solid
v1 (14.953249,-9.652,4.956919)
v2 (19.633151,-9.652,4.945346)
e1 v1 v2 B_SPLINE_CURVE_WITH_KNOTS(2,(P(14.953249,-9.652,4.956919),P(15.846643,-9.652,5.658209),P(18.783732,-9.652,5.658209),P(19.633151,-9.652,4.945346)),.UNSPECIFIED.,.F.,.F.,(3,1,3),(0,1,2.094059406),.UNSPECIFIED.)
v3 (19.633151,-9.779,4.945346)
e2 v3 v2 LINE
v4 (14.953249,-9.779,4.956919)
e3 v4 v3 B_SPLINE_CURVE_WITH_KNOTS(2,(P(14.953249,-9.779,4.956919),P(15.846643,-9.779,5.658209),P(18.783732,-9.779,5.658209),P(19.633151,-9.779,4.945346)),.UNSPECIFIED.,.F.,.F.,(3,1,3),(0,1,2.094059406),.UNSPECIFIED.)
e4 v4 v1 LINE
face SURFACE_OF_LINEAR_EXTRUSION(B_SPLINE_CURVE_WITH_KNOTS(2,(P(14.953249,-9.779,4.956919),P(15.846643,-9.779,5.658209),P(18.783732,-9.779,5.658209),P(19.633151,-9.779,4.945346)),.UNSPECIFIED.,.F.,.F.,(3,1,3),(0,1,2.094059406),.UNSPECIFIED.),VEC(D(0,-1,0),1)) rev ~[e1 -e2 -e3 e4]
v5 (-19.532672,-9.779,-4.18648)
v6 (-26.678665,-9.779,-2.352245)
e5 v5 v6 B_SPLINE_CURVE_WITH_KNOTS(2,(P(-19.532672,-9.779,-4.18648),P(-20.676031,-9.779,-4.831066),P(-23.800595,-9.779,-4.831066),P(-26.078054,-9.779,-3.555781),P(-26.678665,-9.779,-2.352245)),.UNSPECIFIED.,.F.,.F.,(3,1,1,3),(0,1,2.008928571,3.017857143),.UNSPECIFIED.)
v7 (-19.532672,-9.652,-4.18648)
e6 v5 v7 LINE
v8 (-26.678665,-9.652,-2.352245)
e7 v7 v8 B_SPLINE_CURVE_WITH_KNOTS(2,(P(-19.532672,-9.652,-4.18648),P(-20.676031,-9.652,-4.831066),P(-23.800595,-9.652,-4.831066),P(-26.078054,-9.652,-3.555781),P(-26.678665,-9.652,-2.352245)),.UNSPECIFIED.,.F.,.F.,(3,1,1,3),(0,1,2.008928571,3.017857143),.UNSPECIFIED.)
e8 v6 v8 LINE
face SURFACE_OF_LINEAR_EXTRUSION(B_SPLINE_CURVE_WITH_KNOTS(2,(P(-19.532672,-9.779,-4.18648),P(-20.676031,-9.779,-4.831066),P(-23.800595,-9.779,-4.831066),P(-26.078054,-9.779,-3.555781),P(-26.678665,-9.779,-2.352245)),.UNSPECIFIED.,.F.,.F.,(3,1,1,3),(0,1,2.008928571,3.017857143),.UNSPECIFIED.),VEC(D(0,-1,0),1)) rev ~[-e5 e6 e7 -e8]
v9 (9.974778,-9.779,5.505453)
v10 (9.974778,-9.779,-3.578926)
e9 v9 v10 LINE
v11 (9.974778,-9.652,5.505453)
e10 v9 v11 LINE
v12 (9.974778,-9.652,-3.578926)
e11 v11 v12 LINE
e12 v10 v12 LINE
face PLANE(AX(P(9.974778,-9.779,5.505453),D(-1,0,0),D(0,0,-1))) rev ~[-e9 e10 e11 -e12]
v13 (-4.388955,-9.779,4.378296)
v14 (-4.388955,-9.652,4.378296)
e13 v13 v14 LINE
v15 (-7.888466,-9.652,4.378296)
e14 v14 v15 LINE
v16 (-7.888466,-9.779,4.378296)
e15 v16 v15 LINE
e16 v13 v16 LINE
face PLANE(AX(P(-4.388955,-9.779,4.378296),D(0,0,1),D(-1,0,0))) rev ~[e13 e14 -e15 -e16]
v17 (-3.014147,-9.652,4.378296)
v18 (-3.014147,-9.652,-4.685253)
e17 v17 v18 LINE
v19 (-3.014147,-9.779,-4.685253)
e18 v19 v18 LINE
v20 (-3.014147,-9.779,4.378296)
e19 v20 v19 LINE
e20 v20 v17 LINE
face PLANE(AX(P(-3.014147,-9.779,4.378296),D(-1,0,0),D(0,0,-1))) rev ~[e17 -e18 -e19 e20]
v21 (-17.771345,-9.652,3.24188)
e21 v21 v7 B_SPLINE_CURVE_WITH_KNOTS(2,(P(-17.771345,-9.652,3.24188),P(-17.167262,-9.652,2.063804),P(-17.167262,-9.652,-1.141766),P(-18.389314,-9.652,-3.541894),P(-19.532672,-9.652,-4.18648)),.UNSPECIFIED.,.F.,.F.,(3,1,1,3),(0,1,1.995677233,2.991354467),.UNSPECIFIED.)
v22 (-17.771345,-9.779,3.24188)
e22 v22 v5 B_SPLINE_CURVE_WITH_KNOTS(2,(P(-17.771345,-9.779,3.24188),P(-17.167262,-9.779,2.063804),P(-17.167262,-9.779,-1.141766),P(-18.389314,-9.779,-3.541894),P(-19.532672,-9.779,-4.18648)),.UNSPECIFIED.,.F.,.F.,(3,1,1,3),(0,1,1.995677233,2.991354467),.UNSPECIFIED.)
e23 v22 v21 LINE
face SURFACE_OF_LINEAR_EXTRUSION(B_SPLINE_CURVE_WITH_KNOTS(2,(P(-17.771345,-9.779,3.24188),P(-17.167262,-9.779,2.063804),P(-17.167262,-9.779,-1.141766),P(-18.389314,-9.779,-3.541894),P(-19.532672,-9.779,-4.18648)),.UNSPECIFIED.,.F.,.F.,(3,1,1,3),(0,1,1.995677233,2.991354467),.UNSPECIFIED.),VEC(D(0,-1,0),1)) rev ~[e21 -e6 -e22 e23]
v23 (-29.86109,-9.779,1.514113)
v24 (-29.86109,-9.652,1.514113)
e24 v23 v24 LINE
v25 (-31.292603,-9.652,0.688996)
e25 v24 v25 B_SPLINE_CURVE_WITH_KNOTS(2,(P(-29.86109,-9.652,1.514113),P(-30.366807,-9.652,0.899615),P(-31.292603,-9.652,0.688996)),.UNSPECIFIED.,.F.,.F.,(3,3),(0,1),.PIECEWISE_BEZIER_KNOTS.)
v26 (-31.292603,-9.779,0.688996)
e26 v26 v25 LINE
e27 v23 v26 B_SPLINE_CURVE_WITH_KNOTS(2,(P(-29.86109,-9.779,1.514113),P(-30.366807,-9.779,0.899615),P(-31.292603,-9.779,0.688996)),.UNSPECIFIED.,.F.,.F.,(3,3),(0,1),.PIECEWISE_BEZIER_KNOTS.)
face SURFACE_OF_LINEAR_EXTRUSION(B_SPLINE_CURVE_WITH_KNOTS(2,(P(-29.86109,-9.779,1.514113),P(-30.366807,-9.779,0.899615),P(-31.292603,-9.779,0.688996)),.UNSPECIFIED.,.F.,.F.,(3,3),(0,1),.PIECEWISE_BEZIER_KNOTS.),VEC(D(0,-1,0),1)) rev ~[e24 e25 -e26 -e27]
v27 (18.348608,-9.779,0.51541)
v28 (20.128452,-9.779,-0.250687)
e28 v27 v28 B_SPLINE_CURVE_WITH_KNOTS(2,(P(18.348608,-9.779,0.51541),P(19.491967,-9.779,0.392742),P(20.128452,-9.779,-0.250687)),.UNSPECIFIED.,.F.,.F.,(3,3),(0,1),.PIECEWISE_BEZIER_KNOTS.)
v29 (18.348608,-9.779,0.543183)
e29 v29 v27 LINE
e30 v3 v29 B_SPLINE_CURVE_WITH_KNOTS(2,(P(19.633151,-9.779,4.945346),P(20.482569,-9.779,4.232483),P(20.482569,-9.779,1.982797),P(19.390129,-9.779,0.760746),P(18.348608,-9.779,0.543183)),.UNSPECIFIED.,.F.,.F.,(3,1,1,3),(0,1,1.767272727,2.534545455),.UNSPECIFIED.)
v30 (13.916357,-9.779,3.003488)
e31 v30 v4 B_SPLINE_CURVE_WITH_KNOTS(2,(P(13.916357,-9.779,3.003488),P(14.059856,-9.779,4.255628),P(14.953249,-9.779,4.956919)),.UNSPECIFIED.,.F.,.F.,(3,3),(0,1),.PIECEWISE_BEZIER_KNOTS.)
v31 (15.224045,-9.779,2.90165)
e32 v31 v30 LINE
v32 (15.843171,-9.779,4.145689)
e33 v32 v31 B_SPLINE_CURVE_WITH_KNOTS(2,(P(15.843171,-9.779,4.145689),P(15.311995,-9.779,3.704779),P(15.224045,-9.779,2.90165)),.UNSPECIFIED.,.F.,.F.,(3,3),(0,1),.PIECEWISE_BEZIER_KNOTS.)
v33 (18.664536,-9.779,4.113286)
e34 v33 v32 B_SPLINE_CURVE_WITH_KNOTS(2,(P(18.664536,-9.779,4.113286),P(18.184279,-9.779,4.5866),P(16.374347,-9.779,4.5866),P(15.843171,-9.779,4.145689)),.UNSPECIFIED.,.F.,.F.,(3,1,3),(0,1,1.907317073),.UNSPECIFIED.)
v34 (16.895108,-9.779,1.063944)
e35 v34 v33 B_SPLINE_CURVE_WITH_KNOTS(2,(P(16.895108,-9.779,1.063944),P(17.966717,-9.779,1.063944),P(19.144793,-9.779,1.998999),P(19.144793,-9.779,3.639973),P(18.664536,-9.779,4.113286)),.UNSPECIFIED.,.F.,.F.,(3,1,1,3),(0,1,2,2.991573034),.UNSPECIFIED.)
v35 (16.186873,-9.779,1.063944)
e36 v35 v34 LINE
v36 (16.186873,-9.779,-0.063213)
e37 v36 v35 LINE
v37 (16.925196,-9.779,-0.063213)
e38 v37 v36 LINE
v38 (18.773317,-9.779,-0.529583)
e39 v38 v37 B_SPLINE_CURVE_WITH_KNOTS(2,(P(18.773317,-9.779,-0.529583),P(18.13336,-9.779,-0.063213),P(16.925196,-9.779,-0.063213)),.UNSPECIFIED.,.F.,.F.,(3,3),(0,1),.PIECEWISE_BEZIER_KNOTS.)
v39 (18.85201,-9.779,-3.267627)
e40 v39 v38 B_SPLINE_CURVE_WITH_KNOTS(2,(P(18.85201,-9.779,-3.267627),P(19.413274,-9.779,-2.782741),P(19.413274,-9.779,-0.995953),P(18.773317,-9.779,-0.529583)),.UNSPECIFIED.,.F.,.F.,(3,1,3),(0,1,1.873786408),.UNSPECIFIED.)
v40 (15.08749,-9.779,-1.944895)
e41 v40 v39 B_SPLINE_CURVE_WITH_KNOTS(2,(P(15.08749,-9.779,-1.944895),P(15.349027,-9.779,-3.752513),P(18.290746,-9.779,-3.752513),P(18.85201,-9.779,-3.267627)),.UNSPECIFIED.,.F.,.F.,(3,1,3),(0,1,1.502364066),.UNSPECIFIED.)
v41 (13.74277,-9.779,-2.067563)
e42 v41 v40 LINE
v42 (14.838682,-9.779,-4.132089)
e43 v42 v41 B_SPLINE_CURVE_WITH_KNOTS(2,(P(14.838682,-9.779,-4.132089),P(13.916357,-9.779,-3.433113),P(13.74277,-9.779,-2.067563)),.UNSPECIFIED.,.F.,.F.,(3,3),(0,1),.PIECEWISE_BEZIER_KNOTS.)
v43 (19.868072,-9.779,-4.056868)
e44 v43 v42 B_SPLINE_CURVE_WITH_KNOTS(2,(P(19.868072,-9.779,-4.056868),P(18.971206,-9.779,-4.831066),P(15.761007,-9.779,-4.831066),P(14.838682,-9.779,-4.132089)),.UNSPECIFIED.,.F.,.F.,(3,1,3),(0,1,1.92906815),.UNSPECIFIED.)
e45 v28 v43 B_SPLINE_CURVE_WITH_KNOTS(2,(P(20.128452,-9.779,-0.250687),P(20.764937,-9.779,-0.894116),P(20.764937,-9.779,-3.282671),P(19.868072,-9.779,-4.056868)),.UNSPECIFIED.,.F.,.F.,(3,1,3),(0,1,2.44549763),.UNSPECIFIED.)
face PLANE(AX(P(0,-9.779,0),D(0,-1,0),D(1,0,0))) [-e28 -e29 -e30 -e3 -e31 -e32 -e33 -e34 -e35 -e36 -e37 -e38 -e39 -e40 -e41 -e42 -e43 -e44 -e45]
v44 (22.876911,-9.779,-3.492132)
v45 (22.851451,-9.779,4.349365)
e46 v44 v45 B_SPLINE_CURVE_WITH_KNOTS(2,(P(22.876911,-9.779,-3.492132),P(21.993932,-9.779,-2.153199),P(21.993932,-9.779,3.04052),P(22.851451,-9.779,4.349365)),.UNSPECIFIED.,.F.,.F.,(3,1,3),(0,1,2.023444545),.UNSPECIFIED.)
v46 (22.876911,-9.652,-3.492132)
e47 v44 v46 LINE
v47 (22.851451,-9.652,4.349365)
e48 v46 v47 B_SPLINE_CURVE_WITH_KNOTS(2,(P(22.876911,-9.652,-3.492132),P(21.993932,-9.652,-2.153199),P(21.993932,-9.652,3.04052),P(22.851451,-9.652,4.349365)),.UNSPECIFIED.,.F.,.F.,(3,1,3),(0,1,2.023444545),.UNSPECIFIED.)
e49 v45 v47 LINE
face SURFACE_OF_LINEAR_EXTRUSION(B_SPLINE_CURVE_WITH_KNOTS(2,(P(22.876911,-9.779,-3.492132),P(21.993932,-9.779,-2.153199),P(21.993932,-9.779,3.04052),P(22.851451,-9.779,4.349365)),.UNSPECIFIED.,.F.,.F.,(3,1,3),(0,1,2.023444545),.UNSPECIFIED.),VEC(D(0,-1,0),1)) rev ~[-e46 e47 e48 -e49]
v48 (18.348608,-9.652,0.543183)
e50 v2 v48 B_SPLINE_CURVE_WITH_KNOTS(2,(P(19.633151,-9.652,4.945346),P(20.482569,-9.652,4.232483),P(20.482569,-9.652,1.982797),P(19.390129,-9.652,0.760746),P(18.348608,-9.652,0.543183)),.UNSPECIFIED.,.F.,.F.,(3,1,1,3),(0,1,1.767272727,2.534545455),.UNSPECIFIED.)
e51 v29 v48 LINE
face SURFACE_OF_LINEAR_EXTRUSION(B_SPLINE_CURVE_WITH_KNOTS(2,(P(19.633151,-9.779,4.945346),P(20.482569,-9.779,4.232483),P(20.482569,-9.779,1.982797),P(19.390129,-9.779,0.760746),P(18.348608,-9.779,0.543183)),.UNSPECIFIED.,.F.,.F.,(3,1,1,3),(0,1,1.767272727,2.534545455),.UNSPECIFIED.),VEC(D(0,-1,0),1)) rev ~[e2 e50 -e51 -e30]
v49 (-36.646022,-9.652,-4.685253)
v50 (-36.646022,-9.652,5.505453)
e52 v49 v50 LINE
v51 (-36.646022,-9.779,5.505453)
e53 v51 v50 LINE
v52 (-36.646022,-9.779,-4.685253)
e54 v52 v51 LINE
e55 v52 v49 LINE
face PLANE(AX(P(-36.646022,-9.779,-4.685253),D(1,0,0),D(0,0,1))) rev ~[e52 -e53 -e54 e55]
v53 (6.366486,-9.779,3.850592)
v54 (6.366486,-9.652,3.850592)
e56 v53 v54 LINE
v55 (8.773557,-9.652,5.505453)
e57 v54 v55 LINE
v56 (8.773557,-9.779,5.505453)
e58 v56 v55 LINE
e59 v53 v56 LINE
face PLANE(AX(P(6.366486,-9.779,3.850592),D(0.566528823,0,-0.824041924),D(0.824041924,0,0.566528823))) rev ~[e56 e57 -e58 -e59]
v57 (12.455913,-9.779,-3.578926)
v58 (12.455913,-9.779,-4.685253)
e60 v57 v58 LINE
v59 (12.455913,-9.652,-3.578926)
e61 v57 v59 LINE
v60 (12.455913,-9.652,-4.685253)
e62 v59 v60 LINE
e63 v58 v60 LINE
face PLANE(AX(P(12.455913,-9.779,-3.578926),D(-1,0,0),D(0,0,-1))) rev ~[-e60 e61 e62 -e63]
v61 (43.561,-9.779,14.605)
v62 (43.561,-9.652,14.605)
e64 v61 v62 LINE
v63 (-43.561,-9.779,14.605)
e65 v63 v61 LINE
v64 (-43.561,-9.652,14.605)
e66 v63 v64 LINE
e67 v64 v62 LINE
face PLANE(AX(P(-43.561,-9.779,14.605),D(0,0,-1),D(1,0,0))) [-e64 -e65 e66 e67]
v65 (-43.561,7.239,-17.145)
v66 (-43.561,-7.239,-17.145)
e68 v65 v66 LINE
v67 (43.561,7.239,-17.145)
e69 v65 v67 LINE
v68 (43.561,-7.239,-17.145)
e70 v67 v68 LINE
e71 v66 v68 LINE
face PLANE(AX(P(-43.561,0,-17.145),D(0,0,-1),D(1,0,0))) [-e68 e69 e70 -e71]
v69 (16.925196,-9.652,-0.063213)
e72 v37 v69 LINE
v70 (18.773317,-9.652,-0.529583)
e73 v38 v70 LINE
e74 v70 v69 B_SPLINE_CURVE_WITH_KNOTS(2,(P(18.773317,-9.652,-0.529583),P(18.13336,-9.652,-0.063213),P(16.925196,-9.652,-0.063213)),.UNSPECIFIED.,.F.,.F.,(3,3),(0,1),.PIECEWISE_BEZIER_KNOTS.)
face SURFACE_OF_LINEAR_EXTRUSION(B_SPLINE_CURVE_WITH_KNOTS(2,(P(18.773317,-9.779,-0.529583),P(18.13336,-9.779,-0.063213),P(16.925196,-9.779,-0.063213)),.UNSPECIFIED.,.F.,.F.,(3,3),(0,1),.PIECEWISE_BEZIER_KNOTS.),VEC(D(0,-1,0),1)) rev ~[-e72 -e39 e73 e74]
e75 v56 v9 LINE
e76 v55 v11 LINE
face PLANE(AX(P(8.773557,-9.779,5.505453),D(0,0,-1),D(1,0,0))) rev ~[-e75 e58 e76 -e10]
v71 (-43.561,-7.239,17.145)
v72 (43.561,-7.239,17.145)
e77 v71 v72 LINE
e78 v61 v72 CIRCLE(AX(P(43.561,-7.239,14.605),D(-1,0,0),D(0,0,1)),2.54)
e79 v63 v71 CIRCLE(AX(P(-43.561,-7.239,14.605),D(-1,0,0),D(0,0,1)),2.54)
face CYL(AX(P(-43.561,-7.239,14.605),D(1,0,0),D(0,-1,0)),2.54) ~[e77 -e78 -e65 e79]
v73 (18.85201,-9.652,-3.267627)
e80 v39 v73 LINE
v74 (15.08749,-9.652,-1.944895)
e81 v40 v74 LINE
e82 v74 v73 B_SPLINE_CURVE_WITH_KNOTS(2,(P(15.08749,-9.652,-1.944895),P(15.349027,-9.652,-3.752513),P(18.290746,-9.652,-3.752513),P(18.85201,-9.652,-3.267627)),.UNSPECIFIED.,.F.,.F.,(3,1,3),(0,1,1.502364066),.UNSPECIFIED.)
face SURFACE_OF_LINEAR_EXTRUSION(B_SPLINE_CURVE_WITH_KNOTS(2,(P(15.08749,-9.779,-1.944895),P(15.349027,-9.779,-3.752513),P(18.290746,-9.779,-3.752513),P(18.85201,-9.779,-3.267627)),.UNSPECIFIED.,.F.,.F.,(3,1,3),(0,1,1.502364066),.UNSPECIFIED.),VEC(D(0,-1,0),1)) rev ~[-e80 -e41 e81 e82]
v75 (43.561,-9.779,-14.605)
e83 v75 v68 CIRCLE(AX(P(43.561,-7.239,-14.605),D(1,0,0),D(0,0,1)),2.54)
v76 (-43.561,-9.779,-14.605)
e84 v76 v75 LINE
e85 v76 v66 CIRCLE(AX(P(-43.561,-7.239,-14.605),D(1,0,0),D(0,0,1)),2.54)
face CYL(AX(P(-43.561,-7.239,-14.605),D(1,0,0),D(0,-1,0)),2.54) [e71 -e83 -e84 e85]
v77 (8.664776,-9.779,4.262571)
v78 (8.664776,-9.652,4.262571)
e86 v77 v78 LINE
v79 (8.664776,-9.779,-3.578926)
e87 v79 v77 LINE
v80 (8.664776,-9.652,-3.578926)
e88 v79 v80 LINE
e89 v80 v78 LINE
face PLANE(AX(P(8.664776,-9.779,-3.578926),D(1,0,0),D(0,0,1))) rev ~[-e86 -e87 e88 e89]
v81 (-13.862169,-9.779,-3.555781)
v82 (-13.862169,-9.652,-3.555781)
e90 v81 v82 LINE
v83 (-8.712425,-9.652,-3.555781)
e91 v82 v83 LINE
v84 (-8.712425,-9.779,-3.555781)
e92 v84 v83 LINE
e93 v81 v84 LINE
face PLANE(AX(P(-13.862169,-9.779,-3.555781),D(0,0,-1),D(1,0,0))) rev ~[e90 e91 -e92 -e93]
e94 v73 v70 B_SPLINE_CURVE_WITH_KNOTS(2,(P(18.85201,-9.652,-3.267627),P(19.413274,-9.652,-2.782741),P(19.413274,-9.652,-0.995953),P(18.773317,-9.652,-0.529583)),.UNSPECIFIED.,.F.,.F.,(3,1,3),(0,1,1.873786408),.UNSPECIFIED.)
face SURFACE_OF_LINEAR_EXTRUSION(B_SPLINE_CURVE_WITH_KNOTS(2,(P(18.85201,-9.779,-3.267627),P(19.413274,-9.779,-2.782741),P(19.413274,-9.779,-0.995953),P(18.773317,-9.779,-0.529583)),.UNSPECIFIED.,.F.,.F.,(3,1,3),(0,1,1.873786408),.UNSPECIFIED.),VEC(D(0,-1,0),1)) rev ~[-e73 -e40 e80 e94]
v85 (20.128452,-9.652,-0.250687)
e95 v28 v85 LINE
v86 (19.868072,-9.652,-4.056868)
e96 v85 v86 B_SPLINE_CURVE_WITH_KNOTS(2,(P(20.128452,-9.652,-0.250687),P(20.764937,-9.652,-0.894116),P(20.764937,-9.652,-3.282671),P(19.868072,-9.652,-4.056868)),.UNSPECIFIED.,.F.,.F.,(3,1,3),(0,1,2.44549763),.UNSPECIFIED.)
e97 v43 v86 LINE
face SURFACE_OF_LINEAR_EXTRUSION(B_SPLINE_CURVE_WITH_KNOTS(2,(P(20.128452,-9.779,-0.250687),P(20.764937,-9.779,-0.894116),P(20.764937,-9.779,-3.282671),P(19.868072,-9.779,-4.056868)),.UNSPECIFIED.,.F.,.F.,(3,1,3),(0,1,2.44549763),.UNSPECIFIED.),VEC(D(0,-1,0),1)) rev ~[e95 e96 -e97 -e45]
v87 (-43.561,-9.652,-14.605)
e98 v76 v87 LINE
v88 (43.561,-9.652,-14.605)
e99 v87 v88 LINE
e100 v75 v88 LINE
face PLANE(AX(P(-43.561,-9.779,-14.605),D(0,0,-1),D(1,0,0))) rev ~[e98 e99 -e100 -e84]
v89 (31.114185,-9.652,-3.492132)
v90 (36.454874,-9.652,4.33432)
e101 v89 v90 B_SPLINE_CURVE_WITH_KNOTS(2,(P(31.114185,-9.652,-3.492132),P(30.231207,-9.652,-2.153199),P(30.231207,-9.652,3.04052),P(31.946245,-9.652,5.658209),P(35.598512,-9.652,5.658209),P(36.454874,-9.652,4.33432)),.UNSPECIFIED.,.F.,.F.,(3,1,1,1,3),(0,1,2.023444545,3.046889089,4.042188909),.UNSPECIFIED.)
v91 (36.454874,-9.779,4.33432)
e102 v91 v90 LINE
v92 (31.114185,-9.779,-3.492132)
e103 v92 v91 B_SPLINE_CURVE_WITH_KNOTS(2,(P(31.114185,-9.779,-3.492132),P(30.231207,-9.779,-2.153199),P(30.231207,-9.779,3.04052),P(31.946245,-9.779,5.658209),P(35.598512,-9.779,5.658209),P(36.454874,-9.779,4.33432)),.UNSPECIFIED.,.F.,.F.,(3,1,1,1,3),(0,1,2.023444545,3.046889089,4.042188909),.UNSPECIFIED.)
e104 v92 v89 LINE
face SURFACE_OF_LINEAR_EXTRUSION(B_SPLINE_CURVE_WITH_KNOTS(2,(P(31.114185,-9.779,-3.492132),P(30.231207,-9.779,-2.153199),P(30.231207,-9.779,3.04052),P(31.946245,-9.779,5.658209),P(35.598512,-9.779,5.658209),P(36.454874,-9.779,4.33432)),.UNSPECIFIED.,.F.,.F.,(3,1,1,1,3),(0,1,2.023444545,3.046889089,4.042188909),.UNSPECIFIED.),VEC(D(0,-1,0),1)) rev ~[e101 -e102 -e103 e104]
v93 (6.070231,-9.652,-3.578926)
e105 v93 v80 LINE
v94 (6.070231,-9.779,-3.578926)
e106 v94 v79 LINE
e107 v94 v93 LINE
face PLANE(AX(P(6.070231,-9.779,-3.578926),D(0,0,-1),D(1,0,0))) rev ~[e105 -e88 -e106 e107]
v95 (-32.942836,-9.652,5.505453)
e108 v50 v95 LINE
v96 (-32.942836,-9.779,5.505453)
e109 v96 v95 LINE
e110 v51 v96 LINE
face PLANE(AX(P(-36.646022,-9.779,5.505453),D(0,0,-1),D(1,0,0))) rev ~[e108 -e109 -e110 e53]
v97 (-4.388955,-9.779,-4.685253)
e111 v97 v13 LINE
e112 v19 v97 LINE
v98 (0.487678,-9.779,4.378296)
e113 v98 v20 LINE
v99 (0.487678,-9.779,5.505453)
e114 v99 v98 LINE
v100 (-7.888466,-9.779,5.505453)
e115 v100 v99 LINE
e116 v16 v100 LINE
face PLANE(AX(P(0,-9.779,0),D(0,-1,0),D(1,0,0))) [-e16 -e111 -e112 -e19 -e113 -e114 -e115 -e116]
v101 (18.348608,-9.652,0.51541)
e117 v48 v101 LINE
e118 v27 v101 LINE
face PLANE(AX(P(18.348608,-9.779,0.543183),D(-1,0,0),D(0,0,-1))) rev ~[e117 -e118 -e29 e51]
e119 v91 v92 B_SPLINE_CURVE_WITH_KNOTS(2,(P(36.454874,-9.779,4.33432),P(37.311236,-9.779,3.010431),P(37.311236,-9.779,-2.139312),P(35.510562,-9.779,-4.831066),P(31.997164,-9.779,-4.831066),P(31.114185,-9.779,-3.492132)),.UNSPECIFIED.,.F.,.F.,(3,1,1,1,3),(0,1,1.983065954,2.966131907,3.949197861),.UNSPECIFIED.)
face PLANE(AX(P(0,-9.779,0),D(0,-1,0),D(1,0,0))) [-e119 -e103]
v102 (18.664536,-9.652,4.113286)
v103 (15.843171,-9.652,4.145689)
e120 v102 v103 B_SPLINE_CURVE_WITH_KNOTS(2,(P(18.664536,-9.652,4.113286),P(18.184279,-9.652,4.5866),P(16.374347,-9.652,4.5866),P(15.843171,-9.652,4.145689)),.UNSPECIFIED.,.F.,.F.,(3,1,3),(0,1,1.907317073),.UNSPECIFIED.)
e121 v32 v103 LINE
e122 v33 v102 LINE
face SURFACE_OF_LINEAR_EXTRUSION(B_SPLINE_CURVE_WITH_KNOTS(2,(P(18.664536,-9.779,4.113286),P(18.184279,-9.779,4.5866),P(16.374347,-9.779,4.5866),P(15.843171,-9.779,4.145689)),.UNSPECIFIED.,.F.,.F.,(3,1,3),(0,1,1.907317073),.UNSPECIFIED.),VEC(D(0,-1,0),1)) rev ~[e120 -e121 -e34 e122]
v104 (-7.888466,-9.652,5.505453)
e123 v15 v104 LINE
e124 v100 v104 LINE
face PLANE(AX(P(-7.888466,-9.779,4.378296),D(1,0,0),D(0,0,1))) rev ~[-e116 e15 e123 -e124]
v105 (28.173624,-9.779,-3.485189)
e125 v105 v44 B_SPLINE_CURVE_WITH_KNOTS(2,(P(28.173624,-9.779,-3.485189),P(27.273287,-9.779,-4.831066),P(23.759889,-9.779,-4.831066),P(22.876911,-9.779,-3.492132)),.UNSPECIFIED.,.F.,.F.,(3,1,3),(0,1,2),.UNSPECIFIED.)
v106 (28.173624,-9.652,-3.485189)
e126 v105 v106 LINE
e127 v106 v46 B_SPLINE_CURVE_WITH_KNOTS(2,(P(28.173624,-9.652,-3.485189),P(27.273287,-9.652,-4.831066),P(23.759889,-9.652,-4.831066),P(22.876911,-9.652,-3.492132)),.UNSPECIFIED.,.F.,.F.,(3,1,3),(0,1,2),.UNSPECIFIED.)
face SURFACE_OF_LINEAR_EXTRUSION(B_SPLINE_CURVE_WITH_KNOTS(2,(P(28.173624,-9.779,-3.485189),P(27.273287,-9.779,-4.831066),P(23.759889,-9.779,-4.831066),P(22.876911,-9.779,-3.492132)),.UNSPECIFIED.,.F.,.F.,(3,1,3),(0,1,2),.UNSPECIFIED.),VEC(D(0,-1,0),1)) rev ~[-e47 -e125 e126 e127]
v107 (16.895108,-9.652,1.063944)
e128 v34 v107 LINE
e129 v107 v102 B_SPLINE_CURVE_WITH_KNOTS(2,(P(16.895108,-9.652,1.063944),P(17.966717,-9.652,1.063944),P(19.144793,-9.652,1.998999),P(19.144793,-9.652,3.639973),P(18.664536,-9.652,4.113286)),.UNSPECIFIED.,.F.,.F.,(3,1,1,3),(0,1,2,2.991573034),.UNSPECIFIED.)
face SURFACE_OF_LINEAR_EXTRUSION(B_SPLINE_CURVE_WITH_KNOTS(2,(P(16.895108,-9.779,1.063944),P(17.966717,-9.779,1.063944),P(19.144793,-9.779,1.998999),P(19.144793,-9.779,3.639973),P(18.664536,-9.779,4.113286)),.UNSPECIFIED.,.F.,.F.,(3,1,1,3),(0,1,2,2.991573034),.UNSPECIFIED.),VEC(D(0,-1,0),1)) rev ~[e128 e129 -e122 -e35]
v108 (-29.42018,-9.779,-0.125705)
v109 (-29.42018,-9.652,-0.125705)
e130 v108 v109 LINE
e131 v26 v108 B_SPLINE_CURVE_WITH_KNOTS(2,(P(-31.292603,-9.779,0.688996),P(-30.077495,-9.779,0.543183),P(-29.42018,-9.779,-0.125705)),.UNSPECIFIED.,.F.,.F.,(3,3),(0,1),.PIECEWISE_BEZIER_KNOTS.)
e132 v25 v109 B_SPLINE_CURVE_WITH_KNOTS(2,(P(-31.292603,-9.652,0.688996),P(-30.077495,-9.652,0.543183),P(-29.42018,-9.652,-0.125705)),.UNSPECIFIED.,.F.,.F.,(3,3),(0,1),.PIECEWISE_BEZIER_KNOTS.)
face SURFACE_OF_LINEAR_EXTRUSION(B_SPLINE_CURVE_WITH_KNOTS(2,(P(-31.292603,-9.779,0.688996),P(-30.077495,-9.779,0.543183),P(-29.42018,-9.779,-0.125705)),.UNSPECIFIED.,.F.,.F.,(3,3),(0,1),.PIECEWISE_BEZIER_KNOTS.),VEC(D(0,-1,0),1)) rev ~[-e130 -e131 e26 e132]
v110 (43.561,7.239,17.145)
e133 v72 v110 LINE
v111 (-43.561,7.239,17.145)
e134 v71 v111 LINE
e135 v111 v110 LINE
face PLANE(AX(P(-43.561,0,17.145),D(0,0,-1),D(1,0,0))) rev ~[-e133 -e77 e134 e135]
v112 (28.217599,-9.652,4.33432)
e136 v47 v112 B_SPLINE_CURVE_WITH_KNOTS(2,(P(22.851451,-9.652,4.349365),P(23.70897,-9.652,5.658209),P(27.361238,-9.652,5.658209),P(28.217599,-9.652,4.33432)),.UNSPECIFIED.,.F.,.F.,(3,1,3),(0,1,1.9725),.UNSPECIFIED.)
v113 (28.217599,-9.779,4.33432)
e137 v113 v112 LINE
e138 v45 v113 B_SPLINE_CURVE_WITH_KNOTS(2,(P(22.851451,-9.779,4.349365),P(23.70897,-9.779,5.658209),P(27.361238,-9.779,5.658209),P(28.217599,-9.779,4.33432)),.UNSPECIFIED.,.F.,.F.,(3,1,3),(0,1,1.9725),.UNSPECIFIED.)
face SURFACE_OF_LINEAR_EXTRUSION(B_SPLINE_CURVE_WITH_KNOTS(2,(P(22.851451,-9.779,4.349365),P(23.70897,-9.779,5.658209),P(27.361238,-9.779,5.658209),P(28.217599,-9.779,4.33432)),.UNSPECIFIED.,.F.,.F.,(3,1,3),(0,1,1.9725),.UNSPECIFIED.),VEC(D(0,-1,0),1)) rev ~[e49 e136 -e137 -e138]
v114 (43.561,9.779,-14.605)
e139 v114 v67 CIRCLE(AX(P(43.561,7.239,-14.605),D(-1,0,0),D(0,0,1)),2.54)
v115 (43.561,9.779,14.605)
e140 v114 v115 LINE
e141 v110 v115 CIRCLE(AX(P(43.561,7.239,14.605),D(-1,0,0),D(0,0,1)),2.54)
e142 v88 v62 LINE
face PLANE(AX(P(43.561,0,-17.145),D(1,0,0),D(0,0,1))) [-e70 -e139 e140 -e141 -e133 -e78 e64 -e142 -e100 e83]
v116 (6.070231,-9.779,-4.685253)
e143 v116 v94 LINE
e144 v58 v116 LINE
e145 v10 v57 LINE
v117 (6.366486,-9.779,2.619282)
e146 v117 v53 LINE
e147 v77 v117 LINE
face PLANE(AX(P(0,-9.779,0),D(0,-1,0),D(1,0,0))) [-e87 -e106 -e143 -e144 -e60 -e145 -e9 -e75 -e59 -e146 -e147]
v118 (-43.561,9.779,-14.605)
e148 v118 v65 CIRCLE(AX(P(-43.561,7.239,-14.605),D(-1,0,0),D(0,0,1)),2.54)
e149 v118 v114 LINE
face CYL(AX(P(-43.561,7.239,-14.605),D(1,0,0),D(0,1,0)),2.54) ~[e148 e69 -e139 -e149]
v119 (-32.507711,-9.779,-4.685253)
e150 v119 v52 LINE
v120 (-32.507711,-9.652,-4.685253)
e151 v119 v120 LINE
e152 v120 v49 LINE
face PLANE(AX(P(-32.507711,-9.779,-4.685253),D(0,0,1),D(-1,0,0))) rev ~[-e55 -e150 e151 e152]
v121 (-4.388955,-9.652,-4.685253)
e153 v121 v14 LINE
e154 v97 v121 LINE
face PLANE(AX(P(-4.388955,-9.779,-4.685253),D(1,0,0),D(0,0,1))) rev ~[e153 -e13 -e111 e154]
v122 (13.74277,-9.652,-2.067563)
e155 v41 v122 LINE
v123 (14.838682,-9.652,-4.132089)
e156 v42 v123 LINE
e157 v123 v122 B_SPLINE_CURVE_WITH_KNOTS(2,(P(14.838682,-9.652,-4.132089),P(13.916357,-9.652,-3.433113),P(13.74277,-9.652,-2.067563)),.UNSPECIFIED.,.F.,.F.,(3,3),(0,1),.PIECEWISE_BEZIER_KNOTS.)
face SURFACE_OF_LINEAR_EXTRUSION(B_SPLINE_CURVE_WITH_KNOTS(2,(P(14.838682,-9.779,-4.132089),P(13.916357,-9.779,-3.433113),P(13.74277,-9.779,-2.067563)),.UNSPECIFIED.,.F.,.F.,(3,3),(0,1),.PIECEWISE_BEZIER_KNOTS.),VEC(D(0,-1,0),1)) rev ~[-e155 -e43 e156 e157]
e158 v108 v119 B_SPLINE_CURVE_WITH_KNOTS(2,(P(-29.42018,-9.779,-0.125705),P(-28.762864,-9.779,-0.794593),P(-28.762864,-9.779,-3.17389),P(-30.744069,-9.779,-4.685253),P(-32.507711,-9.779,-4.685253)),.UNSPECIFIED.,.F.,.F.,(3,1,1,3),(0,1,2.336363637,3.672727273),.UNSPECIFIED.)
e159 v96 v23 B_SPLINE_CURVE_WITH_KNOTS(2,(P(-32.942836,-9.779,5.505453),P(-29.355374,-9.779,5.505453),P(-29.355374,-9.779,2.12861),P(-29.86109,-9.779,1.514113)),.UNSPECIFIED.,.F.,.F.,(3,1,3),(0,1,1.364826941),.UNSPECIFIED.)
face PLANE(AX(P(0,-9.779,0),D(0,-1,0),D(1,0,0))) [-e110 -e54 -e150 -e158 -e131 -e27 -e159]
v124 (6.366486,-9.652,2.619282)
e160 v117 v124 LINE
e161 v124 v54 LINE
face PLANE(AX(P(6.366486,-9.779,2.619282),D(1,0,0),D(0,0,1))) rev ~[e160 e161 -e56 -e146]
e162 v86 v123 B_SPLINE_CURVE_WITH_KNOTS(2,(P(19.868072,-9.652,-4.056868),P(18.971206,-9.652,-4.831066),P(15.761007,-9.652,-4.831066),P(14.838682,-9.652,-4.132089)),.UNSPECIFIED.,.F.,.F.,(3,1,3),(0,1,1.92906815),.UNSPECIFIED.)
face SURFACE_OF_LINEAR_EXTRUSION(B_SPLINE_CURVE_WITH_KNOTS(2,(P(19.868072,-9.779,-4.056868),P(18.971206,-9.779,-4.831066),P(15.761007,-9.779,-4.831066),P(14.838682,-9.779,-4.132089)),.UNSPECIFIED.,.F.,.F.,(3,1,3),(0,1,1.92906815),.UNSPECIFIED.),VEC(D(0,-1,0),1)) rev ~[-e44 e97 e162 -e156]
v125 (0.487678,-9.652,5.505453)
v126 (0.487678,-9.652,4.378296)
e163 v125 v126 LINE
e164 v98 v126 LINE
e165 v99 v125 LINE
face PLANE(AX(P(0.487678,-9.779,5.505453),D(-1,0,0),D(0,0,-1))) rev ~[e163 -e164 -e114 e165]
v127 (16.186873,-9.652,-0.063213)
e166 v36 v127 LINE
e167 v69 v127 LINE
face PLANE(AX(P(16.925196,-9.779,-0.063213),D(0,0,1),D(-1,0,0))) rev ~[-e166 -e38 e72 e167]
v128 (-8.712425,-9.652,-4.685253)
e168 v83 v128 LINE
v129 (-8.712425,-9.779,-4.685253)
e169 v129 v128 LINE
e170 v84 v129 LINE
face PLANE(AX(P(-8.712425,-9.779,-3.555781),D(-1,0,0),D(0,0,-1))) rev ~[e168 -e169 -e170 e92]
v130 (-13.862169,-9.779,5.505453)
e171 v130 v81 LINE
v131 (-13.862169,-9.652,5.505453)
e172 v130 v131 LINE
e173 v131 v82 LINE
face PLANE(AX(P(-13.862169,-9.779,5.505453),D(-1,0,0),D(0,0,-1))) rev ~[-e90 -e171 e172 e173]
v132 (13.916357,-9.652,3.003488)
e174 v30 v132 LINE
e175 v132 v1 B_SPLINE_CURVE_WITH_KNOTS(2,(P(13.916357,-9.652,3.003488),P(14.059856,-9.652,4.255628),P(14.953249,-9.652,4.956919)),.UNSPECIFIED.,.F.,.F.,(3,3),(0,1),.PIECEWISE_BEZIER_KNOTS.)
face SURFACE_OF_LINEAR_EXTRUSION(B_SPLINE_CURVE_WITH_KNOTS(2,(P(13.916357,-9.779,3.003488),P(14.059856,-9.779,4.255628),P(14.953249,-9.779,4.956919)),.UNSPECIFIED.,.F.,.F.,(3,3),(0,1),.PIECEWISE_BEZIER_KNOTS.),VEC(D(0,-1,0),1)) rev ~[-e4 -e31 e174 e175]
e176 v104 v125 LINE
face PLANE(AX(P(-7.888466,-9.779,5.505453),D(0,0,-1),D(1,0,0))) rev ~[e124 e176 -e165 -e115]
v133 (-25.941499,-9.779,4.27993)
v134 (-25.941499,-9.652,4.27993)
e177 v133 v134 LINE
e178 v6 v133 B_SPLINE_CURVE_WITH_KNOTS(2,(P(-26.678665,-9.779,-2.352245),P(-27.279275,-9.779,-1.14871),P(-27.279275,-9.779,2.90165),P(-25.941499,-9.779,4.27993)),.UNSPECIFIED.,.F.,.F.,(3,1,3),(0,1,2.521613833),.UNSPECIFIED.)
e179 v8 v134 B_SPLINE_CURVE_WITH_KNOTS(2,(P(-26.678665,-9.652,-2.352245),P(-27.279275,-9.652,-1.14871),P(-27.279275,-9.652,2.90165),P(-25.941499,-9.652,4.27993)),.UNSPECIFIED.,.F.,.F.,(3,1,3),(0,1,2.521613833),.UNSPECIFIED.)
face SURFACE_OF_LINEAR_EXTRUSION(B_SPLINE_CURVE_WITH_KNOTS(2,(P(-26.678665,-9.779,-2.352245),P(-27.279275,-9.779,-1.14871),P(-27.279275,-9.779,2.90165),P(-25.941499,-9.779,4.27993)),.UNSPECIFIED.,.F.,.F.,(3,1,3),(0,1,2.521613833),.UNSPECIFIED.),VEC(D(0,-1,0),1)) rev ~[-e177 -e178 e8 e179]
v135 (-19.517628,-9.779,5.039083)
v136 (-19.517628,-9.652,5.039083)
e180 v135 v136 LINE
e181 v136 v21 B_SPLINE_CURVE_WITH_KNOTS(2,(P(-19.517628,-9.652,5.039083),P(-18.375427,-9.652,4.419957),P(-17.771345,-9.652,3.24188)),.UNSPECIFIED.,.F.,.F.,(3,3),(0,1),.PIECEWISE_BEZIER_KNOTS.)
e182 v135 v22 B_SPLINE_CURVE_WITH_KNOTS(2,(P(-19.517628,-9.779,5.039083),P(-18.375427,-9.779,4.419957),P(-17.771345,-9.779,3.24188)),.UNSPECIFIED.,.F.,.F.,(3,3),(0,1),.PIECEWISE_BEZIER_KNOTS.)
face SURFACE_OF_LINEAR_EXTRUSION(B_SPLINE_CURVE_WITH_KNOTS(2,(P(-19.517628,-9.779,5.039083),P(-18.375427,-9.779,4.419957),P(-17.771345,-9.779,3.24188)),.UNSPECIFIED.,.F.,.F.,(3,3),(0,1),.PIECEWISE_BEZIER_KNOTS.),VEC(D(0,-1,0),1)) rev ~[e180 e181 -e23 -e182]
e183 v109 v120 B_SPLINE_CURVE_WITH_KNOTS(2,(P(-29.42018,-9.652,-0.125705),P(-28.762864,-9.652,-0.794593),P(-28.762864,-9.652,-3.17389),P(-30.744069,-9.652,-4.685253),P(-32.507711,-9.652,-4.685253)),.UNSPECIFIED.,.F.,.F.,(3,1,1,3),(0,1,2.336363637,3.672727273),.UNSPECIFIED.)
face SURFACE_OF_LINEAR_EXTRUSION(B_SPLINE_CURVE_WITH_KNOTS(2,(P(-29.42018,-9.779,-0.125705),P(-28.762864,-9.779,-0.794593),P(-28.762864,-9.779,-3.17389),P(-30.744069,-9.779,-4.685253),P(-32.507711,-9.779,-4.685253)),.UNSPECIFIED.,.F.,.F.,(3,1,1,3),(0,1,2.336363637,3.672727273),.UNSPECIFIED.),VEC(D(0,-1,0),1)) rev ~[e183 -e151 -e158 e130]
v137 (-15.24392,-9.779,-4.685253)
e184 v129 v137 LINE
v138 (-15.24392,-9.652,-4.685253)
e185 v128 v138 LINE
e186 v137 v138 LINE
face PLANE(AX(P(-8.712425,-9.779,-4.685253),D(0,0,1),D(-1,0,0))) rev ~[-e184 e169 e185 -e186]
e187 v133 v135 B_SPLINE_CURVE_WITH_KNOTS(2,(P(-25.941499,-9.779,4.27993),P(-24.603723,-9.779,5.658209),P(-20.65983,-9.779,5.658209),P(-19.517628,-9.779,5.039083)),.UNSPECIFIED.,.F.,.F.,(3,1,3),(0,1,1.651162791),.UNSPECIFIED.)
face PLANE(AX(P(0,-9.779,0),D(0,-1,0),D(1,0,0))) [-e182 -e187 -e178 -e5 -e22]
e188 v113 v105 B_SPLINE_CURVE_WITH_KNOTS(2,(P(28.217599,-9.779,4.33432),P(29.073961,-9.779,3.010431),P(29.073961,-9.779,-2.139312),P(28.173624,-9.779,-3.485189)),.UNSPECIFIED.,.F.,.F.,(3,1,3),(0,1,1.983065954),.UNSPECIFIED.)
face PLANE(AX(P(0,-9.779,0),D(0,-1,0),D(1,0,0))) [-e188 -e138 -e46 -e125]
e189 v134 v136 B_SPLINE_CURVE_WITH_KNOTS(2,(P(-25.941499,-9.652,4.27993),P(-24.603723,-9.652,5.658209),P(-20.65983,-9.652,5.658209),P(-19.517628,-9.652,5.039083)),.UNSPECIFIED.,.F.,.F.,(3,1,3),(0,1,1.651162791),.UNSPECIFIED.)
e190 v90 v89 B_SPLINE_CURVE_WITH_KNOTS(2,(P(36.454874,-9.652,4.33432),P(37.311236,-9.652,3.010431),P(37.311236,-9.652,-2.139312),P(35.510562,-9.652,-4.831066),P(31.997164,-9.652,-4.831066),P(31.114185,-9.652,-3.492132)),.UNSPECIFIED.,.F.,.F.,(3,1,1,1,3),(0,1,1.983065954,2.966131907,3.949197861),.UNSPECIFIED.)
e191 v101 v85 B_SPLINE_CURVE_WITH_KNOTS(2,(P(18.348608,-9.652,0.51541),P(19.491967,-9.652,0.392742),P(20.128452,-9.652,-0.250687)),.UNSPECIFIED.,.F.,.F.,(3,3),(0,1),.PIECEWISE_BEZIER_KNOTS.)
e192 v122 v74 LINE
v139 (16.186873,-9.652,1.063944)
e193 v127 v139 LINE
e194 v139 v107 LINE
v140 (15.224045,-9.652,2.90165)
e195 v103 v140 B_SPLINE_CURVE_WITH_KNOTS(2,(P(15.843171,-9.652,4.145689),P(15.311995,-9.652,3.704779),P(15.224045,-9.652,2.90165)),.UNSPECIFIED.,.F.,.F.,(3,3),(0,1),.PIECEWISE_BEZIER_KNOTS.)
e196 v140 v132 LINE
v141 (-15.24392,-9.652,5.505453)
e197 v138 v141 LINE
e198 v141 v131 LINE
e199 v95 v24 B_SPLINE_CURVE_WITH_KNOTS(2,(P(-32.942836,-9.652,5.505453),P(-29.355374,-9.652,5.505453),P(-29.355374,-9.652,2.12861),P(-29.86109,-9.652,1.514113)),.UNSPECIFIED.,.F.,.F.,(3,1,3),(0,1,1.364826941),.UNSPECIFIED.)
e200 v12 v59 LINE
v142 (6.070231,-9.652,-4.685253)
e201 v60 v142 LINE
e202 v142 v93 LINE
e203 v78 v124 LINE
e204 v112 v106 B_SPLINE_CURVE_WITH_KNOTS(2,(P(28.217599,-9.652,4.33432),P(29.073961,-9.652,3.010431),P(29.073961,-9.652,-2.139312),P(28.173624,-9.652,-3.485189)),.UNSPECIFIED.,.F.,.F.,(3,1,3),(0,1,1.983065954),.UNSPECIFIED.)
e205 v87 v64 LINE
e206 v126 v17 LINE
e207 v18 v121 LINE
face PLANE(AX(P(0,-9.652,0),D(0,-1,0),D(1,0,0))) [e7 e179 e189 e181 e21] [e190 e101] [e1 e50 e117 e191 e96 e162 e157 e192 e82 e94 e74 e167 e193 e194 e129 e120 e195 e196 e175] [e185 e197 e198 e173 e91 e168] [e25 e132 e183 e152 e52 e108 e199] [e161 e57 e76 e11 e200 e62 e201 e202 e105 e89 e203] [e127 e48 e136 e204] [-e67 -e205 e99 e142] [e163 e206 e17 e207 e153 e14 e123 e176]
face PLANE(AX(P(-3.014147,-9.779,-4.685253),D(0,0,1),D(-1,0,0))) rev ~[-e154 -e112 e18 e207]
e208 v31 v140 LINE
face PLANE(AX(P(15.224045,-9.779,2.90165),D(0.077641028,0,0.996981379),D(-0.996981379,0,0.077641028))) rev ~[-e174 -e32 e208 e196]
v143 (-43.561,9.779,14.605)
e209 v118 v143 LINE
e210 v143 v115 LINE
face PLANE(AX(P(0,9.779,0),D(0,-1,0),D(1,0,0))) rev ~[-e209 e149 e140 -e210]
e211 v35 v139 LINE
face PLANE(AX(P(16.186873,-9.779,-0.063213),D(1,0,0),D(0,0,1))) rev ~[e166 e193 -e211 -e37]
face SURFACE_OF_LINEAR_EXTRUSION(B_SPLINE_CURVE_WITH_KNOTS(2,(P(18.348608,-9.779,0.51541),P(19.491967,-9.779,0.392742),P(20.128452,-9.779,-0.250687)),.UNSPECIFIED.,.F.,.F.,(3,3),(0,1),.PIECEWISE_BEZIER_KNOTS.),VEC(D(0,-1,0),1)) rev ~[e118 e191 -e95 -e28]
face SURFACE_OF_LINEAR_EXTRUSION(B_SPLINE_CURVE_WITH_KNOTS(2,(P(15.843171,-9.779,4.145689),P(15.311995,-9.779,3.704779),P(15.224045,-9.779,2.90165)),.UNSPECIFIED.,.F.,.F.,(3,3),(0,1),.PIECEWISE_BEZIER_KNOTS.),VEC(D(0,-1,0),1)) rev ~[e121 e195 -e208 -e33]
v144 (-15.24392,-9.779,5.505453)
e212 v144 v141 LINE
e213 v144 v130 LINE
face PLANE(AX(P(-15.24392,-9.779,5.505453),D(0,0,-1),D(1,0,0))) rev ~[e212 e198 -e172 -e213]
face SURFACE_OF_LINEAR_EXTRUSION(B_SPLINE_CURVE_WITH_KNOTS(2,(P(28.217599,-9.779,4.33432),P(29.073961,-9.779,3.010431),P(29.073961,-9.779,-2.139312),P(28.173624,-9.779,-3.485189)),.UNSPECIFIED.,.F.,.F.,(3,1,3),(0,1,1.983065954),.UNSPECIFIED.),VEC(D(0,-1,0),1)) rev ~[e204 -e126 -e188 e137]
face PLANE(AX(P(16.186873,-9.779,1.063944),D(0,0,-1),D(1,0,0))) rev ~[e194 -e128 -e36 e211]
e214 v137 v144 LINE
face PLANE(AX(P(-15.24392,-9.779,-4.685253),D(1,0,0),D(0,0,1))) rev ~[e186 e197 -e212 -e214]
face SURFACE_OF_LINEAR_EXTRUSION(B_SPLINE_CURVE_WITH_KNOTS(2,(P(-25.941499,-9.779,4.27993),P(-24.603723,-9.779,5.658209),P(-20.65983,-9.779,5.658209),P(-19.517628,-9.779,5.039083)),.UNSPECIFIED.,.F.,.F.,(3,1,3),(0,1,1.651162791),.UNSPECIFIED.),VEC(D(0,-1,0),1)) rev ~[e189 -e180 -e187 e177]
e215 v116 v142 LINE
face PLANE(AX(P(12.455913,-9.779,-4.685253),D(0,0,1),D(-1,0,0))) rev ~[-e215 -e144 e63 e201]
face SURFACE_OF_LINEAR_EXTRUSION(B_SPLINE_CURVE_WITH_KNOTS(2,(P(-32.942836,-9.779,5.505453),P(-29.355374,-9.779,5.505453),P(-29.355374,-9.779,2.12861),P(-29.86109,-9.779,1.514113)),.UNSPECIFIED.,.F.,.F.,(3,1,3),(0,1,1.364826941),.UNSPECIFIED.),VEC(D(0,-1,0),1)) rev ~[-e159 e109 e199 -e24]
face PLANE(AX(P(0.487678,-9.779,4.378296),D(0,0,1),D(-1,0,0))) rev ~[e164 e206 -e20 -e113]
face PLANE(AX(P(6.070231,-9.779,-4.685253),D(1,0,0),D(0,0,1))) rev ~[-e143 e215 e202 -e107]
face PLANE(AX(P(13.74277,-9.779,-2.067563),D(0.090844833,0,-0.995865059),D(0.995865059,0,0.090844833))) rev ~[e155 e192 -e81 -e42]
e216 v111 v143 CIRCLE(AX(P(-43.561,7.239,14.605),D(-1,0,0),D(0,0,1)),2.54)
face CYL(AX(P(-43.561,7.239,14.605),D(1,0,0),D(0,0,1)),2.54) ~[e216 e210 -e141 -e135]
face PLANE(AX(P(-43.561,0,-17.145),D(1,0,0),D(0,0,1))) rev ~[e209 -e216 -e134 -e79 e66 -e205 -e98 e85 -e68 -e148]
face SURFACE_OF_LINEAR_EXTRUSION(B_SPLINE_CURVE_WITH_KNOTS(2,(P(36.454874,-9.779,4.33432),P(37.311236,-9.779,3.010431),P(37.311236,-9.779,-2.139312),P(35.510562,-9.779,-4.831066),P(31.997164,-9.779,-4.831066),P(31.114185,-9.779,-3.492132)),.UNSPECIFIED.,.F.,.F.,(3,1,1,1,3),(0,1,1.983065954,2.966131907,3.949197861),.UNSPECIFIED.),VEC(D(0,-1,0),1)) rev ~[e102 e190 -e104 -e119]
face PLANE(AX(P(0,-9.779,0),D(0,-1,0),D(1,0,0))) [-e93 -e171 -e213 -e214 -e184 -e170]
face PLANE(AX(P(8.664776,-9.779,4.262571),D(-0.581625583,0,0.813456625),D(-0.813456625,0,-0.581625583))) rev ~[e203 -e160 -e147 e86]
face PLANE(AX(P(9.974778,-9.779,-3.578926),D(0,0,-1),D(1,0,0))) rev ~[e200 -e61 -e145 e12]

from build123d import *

# Parameters (mm, degrees)
F0_W     = 87.122
F0_H     = 34.29
F1_DEPTH = 9.779
F2_R     = 2.54
F3_W     = 87.122
F3_H     = 29.21
F4_DEPTH = 0.127


with BuildPart() as f1:
    # F0 (on Front) → F1 (new body, symmetric)
    with BuildSketch(Plane.XZ):
        Rectangle(F0_W, F0_H)
    extrude(amount=F1_DEPTH, both=True)

    # F2
    f2_edges = [f1.edges().sort_by_distance(p)[0] for p in [
        (0, 9.779, 17.145),
        (0, 9.779, -17.145),
        (0, -9.779, 17.145),
        (0, -9.779, -17.145),
    ]]
    fillet(f2_edges, radius=F2_R)

    # F3 (on face) → F4 (cut)
    with BuildSketch(Plane.XZ.offset(9.779)):
        Rectangle(F3_W, F3_H)
        with BuildLine():
            add(Edge.make_bspline(
                [(-29.4201796663, -0.1257045448), (-28.7628641118, -0.7945925563), (-28.7628641118, -1.8129687674)],
                knots=[0, 0, 0, 1, 1, 1], degree=2))
            add(Edge.make_bspline(
                [(-28.7628641118, -1.8129687674), (-28.7628641118, -3.1738897042), (-29.7534664263, -3.9295711427)],
                knots=[0, 0, 0, 1, 1, 1], degree=2))
            add(Edge.make_bspline(
                [(-29.7534664263, -3.9295711427), (-30.7440687408, -4.6852525812), (-32.5077111792, -4.6852525812)],
                knots=[0, 0, 0, 1, 1, 1], degree=2))
            Line((-32.5077111792, -4.6852525812), (-36.6460217827, -4.6852525812))
            Line((-36.6460217827, -4.6852525812), (-36.6460217827, 5.5054530046))
            Line((-36.6460217827, 5.5054530046), (-32.9428355603, 5.5054530046))
            add(Edge.make_bspline(
                [(-32.9428355603, 5.5054530046), (-29.3553739074, 5.5054530046), (-29.3553739074, 3.0312617097)],
                knots=[0, 0, 0, 1, 1, 1], degree=2))
            add(Edge.make_bspline(
                [(-29.3553739074, 3.0312617097), (-29.3553739074, 2.128610068), (-29.8610902759, 1.5141126043)],
                knots=[0, 0, 0, 1, 1, 1], degree=2))
            add(Edge.make_bspline(
                [(-29.8610902759, 1.5141126043), (-30.3668066444, 0.8996151405), (-31.2926032, 0.6889964241)],
                knots=[0, 0, 0, 1, 1, 1], degree=2))
            add(Edge.make_bspline(
                [(-31.2926032, 0.6889964241), (-30.0774952208, 0.5431834666), (-29.4201796663, -0.1257045448)],
                knots=[0, 0, 0, 1, 1, 1], degree=2))
        make_face(mode=Mode.SUBTRACT)
        with BuildLine():
            add(Edge.make_bspline(
                [(-17.7713445055, 3.2418804261), (-17.1672622529, 2.0638043091), (-17.1672622529, 0.4575472852)],
                knots=[0, 0, 0, 1, 1, 1], degree=2))
            add(Edge.make_bspline(
                [(-17.1672622529, 0.4575472852), (-17.1672622529, -1.1417662646), (-17.7782879796, -2.3418300498)],
                knots=[0, 0, 0, 1, 1, 1], degree=2))
            add(Edge.make_bspline(
                [(-17.7782879796, -2.3418300498), (-18.3893137063, -3.541893835), (-19.5326724525, -4.1864796868)],
                knots=[0, 0, 0, 1, 1, 1], degree=2))
            add(Edge.make_bspline(
                [(-19.5326724525, -4.1864796868), (-20.6760311986, -4.8310655387), (-22.2313694121, -4.8310655387)],
                knots=[0, 0, 0, 1, 1, 1], degree=2))
            add(Edge.make_bspline(
                [(-22.2313694121, -4.8310655387), (-23.8005945738, -4.8310655387), (-24.9393243372, -4.193423161)],
                knots=[0, 0, 0, 1, 1, 1], degree=2))
            add(Edge.make_bspline(
                [(-24.9393243372, -4.193423161), (-26.0780541006, -3.5557807833), (-26.678664616, -2.3522452611)],
                knots=[0, 0, 0, 1, 1, 1], degree=2))
            add(Edge.make_bspline(
                [(-26.678664616, -2.3522452611), (-27.2792751315, -1.1487097388), (-27.2792751315, 0.4575472852)],
                knots=[0, 0, 0, 1, 1, 1], degree=2))
            add(Edge.make_bspline(
                [(-27.2792751315, 0.4575472852), (-27.2792751315, 2.901650192), (-25.9414991086, 4.2799298141)],
                knots=[0, 0, 0, 1, 1, 1], degree=2))
            add(Edge.make_bspline(
                [(-25.9414991086, 4.2799298141), (-24.6037230858, 5.6582094363), (-22.2151679723, 5.6582094363)],
                knots=[0, 0, 0, 1, 1, 1], degree=2))
            add(Edge.make_bspline(
                [(-22.2151679723, 5.6582094363), (-20.6598297589, 5.6582094363), (-19.5176282585, 5.0390829897)],
                knots=[0, 0, 0, 1, 1, 1], degree=2))
            add(Edge.make_bspline(
                [(-19.5176282585, 5.0390829897), (-18.375426758, 4.4199565431), (-17.7713445055, 3.2418804261)],
                knots=[0, 0, 0, 1, 1, 1], degree=2))
        make_face(mode=Mode.SUBTRACT)
        Polygon((-8.7124252089, -4.6852525812), (-15.2439199087, -4.6852525812), (-15.2439199087, 5.5054530046), (-13.8621685494, 5.5054530046), (-13.8621685494, -3.5557807833), (-8.7124252089, -3.5557807833), align=None, mode=Mode.SUBTRACT)
        Polygon((0.4876780624, 4.3782956981), (-3.0141474092, 4.3782956981), (-3.0141474092, -4.6852525812), (-4.3889552943, -4.6852525812), (-4.3889552943, 4.3782956981), (-7.8884662744, 4.3782956981), (-7.8884662744, 5.5054530046), (0.4876780624, 5.5054530046), align=None, mode=Mode.SUBTRACT)
        Polygon((12.4559130349, -4.6852525812), (6.0702312926, -4.6852525812), (6.0702312926, -3.5789256972), (8.6647761397, -3.5789256972), (8.6647761397, 4.2625711287), (6.3664861904, 2.6192822425), (6.3664861904, 3.8505916615), (8.773557235, 5.5054530046), (9.9747782659, 5.5054530046), (9.9747782659, -3.5789256972), (12.4559130349, -3.5789256972), align=None, mode=Mode.SUBTRACT)
        with BuildLine():
            add(Edge.make_bspline(
                [(20.1284519894, -0.2506870799), (20.7649371214, -0.894115686), (20.7649371214, -1.8708310521)],
                knots=[0, 0, 0, 1, 1, 1], degree=2))
            add(Edge.make_bspline(
                [(20.7649371214, -1.8708310521), (20.7649371214, -3.2826707994), (19.8680717081, -4.0568681691)],
                knots=[0, 0, 0, 1, 1, 1], degree=2))
            add(Edge.make_bspline(
                [(19.8680717081, -4.0568681691), (18.9712062949, -4.8310655387), (17.3070869862, -4.8310655387)],
                knots=[0, 0, 0, 1, 1, 1], degree=2))
            add(Edge.make_bspline(
                [(17.3070869862, -4.8310655387), (15.7610067384, -4.8310655387), (14.8386819198, -4.1320891392)],
                knots=[0, 0, 0, 1, 1, 1], degree=2))
            add(Edge.make_bspline(
                [(14.8386819198, -4.1320891392), (13.9163571013, -3.4331127397), (13.7427702471, -2.0675628202)],
                knots=[0, 0, 0, 1, 1, 1], degree=2))
            Line((13.7427702471, -2.0675628202), (15.0874897442, -1.9448947766))
            add(Edge.make_bspline(
                [(15.0874897442, -1.9448947766), (15.3490272711, -3.7525125514), (17.3070869862, -3.7525125514)],
                knots=[0, 0, 0, 1, 1, 1], degree=2))
            add(Edge.make_bspline(
                [(17.3070869862, -3.7525125514), (18.2907458265, -3.7525125514), (18.8520099884, -3.2676266054)],
                knots=[0, 0, 0, 1, 1, 1], degree=2))
            add(Edge.make_bspline(
                [(18.8520099884, -3.2676266054), (19.4132741502, -2.7827406594), (19.4132741502, -1.8291702071)],
                knots=[0, 0, 0, 1, 1, 1], degree=2))
            add(Edge.make_bspline(
                [(19.4132741502, -1.8291702071), (19.4132741502, -0.9959533071), (18.7733172811, -0.5295832922)],
                knots=[0, 0, 0, 1, 1, 1], degree=2))
            add(Edge.make_bspline(
                [(18.7733172811, -0.5295832922), (18.1333604121, -0.0632132773), (16.925195907, -0.0632132773)],
                knots=[0, 0, 0, 1, 1, 1], degree=2))
            Line((16.925195907, -0.0632132773), (16.1868731539, -0.0632132773))
            Line((16.1868731539, -0.0632132773), (16.1868731539, 1.0639440291))
            Line((16.1868731539, 1.0639440291), (16.895107519, 1.0639440291))
            add(Edge.make_bspline(
                [(16.895107519, 1.0639440291), (17.9667170321, 1.0639440291), (18.5557550906, 1.5314712897)],
                knots=[0, 0, 0, 1, 1, 1], degree=2))
            add(Edge.make_bspline(
                [(18.5557550906, 1.5314712897), (19.1447931491, 1.9989985503), (19.1447931491, 2.8229574847)],
                knots=[0, 0, 0, 1, 1, 1], degree=2))
            add(Edge.make_bspline(
                [(19.1447931491, 2.8229574847), (19.1447931491, 3.6399729451), (18.6645361859, 4.1132864341)],
                knots=[0, 0, 0, 1, 1, 1], degree=2))
            add(Edge.make_bspline(
                [(18.6645361859, 4.1132864341), (18.1842792226, 4.5865999232), (17.2353377531, 4.5865999232)],
                knots=[0, 0, 0, 1, 1, 1], degree=2))
            add(Edge.make_bspline(
                [(17.2353377531, 4.5865999232), (16.3743469564, 4.5865999232), (15.8431711827, 4.1456893136)],
                knots=[0, 0, 0, 1, 1, 1], degree=2))
            add(Edge.make_bspline(
                [(15.8431711827, 4.1456893136), (15.3119954089, 3.7047787039), (15.2240447361, 2.901650192)],
                knots=[0, 0, 0, 1, 1, 1], degree=2))
            Line((15.2240447361, 2.901650192), (13.9163571013, 3.0034878131))
            add(Edge.make_bspline(
                [(13.9163571013, 3.0034878131), (14.0598555674, 4.2556276545), (14.9532492436, 4.9569185454)],
                knots=[0, 0, 0, 1, 1, 1], degree=2))
            add(Edge.make_bspline(
                [(14.9532492436, 4.9569185454), (15.8466429197, 5.6582094363), (17.2492247015, 5.6582094363)],
                knots=[0, 0, 0, 1, 1, 1], degree=2))
            add(Edge.make_bspline(
                [(17.2492247015, 5.6582094363), (18.7837324924, 5.6582094363), (19.6331508322, 4.9453460885)],
                knots=[0, 0, 0, 1, 1, 1], degree=2))
            add(Edge.make_bspline(
                [(19.6331508322, 4.9453460885), (20.4825691719, 4.2324827406), (20.4825691719, 2.9595124767)],
                knots=[0, 0, 0, 1, 1, 1], degree=2))
            add(Edge.make_bspline(
                [(20.4825691719, 2.9595124767), (20.4825691719, 1.9827971105), (19.9363492041, 1.3717713838)],
                knots=[0, 0, 0, 1, 1, 1], degree=2))
            add(Edge.make_bspline(
                [(19.9363492041, 1.3717713838), (19.3901292363, 0.7607456571), (18.3486081113, 0.5431834666)],
                knots=[0, 0, 0, 1, 1, 1], degree=2))
            Line((18.3486081113, 0.5431834666), (18.3486081113, 0.5154095699))
            add(Edge.make_bspline(
                [(18.3486081113, 0.5154095699), (19.4919668574, 0.3927415263), (20.1284519894, -0.2506870799)],
                knots=[0, 0, 0, 1, 1, 1], degree=2))
        make_face(mode=Mode.SUBTRACT)
        with BuildLine():
            add(Edge.make_bspline(
                [(28.2175993939, 4.3343203618), (29.0739612079, 3.0104312872), (29.0739612079, 0.4135719488)],
                knots=[0, 0, 0, 1, 1, 1], degree=2))
            add(Edge.make_bspline(
                [(29.0739612079, 0.4135719488), (29.0739612079, -2.1393120533), (28.1736240576, -3.485188796)],
                knots=[0, 0, 0, 1, 1, 1], degree=2))
            add(Edge.make_bspline(
                [(28.1736240576, -3.485188796), (27.2732869072, -4.8310655387), (25.516587943, -4.8310655387)],
                knots=[0, 0, 0, 1, 1, 1], degree=2))
            add(Edge.make_bspline(
                [(25.516587943, -4.8310655387), (23.7598889787, -4.8310655387), (22.8769105138, -3.4921322701)],
                knots=[0, 0, 0, 1, 1, 1], degree=2))
            add(Edge.make_bspline(
                [(22.8769105138, -3.4921322701), (21.9939320489, -2.1531990016), (21.9939320489, 0.4135719488)],
                knots=[0, 0, 0, 1, 1, 1], degree=2))
            add(Edge.make_bspline(
                [(21.9939320489, 0.4135719488), (21.9939320489, 3.0405196753), (22.8514511086, 4.3493645558)],
                knots=[0, 0, 0, 1, 1, 1], degree=2))
            add(Edge.make_bspline(
                [(22.8514511086, 4.3493645558), (23.7089701682, 5.6582094363), (25.5605632794, 5.6582094363)],
                knots=[0, 0, 0, 1, 1, 1], degree=2))
            add(Edge.make_bspline(
                [(25.5605632794, 5.6582094363), (27.36123758, 5.6582094363), (28.2175993939, 4.3343203618)],
                knots=[0, 0, 0, 1, 1, 1], degree=2))
        make_face(mode=Mode.SUBTRACT)
        with BuildLine():
            add(Edge.make_bspline(
                [(36.4548742474, 4.3343203618), (37.3112360613, 3.0104312872), (37.3112360613, 0.4135719488)],
                knots=[0, 0, 0, 1, 1, 1], degree=2))
            add(Edge.make_bspline(
                [(37.3112360613, 0.4135719488), (37.3112360613, -2.1393120533), (36.410898911, -3.485188796)],
                knots=[0, 0, 0, 1, 1, 1], degree=2))
            add(Edge.make_bspline(
                [(36.410898911, -3.485188796), (35.5105617607, -4.8310655387), (33.7538627964, -4.8310655387)],
                knots=[0, 0, 0, 1, 1, 1], degree=2))
            add(Edge.make_bspline(
                [(33.7538627964, -4.8310655387), (31.9971638322, -4.8310655387), (31.1141853673, -3.4921322701)],
                knots=[0, 0, 0, 1, 1, 1], degree=2))
            add(Edge.make_bspline(
                [(31.1141853673, -3.4921322701), (30.2312069024, -2.1531990016), (30.2312069024, 0.4135719488)],
                knots=[0, 0, 0, 1, 1, 1], degree=2))
            add(Edge.make_bspline(
                [(30.2312069024, 0.4135719488), (30.2312069024, 3.0405196753), (31.088725962, 4.3493645558)],
                knots=[0, 0, 0, 1, 1, 1], degree=2))
            add(Edge.make_bspline(
                [(31.088725962, 4.3493645558), (31.9462450216, 5.6582094363), (33.7978381328, 5.6582094363)],
                knots=[0, 0, 0, 1, 1, 1], degree=2))
            add(Edge.make_bspline(
                [(33.7978381328, 5.6582094363), (35.5985124335, 5.6582094363), (36.4548742474, 4.3343203618)],
                knots=[0, 0, 0, 1, 1, 1], degree=2))
        make_face(mode=Mode.SUBTRACT)
    extrude(amount=-F4_DEPTH, mode=Mode.SUBTRACT)


solid = f1.part
